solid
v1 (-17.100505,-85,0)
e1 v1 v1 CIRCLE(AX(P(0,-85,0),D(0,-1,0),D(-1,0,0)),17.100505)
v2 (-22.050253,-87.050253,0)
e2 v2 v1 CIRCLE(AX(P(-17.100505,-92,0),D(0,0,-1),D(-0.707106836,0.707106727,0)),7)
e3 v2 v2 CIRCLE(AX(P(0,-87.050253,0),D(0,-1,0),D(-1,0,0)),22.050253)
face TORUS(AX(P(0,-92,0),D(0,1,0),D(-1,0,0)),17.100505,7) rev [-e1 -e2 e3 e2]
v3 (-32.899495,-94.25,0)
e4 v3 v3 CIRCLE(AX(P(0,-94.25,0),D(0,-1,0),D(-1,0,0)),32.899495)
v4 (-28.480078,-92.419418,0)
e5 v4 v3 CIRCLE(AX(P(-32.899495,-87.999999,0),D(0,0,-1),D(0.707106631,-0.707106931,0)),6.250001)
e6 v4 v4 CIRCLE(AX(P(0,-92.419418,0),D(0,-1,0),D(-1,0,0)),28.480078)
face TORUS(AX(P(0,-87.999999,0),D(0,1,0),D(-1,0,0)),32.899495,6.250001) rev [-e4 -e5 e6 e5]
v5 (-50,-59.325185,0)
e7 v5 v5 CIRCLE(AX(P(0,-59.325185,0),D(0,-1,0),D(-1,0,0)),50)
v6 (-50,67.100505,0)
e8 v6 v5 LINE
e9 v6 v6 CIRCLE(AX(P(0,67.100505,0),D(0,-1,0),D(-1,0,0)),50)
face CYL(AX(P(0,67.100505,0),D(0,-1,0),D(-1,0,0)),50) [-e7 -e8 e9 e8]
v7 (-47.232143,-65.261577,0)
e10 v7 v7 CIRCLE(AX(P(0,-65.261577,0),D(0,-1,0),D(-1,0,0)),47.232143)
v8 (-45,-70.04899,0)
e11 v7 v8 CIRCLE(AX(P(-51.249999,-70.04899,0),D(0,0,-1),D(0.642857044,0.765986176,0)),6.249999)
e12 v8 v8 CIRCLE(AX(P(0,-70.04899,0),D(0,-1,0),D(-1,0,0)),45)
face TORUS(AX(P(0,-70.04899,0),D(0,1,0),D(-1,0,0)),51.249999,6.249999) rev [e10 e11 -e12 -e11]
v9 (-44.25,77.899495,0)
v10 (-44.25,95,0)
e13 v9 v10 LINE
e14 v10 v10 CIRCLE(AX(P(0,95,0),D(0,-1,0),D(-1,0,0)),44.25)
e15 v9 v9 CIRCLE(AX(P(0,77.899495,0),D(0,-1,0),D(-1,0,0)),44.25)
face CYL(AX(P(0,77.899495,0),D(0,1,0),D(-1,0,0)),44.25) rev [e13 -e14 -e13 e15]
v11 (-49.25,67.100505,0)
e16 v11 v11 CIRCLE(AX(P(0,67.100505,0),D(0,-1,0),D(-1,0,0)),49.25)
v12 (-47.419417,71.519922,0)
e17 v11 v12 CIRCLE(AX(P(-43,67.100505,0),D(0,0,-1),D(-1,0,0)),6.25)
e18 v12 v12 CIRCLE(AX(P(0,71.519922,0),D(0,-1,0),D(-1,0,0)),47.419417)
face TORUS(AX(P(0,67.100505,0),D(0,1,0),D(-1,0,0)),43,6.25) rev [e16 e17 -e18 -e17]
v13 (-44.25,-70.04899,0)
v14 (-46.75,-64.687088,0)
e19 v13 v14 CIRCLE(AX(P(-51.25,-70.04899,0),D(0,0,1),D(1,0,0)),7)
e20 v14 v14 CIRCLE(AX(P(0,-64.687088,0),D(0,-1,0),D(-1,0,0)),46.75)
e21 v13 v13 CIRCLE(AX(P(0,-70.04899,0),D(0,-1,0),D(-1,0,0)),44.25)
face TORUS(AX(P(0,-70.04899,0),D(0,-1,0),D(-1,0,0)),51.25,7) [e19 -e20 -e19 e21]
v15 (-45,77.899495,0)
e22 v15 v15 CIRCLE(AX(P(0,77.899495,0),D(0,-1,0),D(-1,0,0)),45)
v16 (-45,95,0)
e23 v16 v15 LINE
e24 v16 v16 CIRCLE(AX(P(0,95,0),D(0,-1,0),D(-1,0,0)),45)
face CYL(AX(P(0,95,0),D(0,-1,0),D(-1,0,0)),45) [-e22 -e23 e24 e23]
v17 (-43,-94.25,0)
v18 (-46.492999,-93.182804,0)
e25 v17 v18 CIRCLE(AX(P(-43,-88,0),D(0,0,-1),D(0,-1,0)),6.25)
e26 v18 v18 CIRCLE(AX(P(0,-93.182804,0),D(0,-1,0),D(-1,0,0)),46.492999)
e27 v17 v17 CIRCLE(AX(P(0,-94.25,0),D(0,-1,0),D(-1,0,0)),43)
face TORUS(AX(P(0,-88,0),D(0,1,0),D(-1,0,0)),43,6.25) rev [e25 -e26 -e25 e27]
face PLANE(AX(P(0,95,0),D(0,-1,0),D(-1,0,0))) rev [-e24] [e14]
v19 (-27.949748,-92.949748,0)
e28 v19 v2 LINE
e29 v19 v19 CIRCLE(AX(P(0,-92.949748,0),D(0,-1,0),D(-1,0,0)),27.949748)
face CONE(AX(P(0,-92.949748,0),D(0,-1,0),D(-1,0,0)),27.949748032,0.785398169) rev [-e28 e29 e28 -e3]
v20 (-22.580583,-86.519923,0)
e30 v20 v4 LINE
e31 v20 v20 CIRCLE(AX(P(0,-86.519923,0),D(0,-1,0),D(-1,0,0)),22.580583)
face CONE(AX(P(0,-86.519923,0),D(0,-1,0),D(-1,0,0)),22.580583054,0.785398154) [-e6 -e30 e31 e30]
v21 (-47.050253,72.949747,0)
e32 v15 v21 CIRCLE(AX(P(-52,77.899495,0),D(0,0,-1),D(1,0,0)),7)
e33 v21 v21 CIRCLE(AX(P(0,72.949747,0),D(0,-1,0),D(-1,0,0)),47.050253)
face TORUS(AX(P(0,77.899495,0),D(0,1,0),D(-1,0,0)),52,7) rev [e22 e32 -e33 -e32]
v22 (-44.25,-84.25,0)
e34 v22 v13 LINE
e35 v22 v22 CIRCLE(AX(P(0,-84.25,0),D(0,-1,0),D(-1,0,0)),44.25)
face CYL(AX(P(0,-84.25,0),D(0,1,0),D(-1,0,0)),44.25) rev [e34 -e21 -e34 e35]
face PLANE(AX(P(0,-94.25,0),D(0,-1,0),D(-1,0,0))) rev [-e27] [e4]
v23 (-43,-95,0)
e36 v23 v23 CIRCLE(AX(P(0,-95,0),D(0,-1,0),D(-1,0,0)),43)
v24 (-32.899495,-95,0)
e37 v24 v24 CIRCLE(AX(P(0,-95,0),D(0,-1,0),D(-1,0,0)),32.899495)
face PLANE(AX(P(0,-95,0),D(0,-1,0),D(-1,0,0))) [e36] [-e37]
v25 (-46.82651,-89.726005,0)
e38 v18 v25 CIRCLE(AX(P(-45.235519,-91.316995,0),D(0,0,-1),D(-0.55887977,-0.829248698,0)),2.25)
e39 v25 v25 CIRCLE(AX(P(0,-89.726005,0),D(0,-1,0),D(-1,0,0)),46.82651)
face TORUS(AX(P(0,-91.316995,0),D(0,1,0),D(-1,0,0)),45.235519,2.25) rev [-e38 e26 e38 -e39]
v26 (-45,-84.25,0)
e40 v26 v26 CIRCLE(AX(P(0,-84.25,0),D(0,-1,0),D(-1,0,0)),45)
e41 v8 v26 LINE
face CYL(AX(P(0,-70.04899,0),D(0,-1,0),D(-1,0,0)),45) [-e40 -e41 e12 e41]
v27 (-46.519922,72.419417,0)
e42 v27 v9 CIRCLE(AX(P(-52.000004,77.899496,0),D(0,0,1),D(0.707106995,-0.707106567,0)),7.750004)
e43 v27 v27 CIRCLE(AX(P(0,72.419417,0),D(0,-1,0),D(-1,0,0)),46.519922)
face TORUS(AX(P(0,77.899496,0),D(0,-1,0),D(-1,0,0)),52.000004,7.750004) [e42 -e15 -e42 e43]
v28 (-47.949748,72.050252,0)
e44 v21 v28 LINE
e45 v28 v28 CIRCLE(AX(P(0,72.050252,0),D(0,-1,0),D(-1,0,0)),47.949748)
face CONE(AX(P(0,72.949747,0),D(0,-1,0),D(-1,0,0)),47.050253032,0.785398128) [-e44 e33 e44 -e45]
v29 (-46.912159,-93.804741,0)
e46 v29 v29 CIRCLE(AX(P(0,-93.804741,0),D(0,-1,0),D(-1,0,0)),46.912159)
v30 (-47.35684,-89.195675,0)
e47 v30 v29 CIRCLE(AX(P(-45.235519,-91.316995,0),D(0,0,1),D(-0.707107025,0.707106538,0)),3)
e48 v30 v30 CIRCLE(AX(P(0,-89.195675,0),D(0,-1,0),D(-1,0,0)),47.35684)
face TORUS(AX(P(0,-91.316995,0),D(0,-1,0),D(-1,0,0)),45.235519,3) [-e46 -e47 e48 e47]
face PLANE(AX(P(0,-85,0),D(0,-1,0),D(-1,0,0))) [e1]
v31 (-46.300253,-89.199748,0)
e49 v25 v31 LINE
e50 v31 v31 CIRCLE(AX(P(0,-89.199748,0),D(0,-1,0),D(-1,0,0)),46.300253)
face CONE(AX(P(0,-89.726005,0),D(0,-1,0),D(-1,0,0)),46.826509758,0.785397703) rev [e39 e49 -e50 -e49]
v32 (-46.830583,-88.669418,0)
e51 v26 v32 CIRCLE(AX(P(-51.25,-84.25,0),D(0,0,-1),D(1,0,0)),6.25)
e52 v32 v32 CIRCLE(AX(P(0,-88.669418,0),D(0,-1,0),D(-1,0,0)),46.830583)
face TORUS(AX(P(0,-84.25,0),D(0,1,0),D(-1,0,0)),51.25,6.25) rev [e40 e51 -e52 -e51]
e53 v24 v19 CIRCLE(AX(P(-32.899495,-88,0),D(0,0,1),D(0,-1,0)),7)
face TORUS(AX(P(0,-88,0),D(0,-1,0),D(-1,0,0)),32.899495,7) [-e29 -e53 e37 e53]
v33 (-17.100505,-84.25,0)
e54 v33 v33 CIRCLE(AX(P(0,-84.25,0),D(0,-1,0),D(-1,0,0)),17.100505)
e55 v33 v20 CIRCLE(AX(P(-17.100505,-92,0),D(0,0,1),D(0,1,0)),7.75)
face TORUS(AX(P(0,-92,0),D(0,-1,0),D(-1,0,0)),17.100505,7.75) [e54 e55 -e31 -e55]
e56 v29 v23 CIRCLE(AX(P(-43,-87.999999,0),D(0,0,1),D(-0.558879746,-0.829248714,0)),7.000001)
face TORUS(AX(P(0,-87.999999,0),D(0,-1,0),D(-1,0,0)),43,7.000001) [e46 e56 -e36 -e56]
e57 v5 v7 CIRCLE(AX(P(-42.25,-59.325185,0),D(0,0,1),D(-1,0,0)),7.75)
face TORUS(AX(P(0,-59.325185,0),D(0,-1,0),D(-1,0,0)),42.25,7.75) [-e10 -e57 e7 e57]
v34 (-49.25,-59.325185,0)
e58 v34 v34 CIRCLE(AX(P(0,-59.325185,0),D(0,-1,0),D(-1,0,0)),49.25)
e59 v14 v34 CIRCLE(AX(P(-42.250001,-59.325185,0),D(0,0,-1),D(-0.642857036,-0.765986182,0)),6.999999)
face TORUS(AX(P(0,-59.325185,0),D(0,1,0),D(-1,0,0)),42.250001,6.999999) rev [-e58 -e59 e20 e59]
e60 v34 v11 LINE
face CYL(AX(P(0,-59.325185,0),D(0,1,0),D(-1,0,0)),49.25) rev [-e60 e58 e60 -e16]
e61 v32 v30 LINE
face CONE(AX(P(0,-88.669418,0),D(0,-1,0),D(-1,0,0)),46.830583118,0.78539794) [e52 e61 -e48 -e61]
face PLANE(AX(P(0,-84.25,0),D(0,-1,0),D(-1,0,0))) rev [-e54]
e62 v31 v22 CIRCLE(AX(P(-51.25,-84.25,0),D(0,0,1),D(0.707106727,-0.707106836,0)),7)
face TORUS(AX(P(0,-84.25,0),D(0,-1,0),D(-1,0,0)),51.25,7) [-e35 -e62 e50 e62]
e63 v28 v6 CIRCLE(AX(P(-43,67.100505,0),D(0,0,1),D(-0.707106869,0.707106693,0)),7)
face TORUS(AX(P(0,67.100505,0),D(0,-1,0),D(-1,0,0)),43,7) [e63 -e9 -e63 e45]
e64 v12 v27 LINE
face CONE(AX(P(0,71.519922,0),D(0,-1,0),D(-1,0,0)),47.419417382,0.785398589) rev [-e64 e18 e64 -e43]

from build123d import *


# Not quite as in the source:
# - ends of sketch curves that miss each other by under 0.0002 mm in the source are joined


with BuildPart() as f1:
    # F0 (on Top) → F1 (revolve)
    with BuildSketch(Plane.XY):
        with BuildLine():
            Line((-50, 0), (-49.25, 0))
            Line((-49.25, 0), (-49.25, 67.100505))
            ThreePointArc((-49.25, 67.100505), (-48.7742470782, 69.4922764523), (-47.4194173824, 71.5199223824))
            Line((-47.4194173824, 71.5199223824), (-46.519922, 72.419417))
            ThreePointArc((-46.519922, 72.419417), (-44.839933623, 74.9336983992), (-44.25, 77.899495))
            Line((-44.25, 77.899495), (-44.25, 95))
            Line((-44.25, 95), (-45, 95))
            Line((-45, 95), (-45, 77.899495))
            ThreePointArc((-45, 77.899495), (-45.5328434077, 75.2207106468), (-47.0502530317, 72.9497470317))
            Line((-47.0502530317, 72.9497470317), (-47.949748, 72.050252))
            ThreePointArc((-47.949748, 72.050252), (-49.4671568629, 69.7792886999), (-50, 67.100505))
            Line((-50, 67.100505), (-50, 0))
        make_face()
        with BuildLine():
            Line((0, -85), (0, -84.25))
            Line((0, -84.25), (-17.100505, -84.25))
            ThreePointArc((-17.100505, -84.25), (-20.0663019275, -84.8399337583), (-22.5805830542, -86.5199229458))
            Line((-22.5805830542, -86.5199229458), (-28.480078, -92.419418))
            ThreePointArc((-28.480078, -92.419418), (-30.5077238744, -93.7742472135), (-32.899495, -94.25))
            Line((-32.899495, -94.25), (-43, -94.25))
            ThreePointArc((-43, -94.25), (-44.8261945083, -93.97724967), (-46.4929985671, -93.1828043577))
            ThreePointArc((-46.4929985671, -93.1828043577), (-47.4751196599, -91.5330711078), (-46.8265097577, -89.7260052423))
            Line((-46.8265097577, -89.7260052423), (-46.300253, -89.199748))
            ThreePointArc((-46.300253, -89.199748), (-44.7828434077, -86.9287843532), (-44.25, -84.25))
            Line((-44.25, -84.25), (-44.25, -70.04899))
            ThreePointArc((-44.25, -70.04899), (-44.9057111418, -67.090950297), (-46.7499996812, -64.6870876202))
            ThreePointArc((-46.7499996812, -64.6870876202), (-48.5942887223, -62.2832249943), (-49.25, -59.325185))
            Line((-49.25, -59.325185), (-49.25, 0))
            Line((-49.25, 0), (-50, 0))
            Line((-50, 0), (-50, -59.325185))
            ThreePointArc((-50, -59.325185), (-49.2740340482, -62.6001576243), (-47.2321430477, -65.2615770568))
            ThreePointArc((-47.2321430477, -65.2615770568), (-45.5854564677, -67.4078829271), (-45, -70.04899))
            Line((-45, -70.04899), (-45, -84.25))
            ThreePointArc((-45, -84.25), (-45.4757530571, -86.6417717789), (-46.8305831176, -88.6694178824))
            Line((-46.8305831176, -88.6694178824), (-47.35684, -89.195675))
            ThreePointArc((-47.35684, -89.195675), (-48.2216532424, -91.6050961743), (-46.9121588277, -93.8047407443))
            ThreePointArc((-46.9121588277, -93.8047407443), (-45.0453380572, -94.6945195669), (-43, -95))
            Line((-43, -95), (-32.899495, -95))
            ThreePointArc((-32.899495, -95), (-30.2207113001, -94.4671568629), (-27.9497480317, -92.9497479683))
            Line((-27.9497480317, -92.9497479683), (-22.050253, -87.050253))
            ThreePointArc((-22.050253, -87.050253), (-19.7792893532, -85.5328434077), (-17.100505, -85))
            Line((-17.100505, -85), (0, -85))
        make_face()
    revolve(axis=Axis((0, 0, 0), (0, -1, 0)))


solid = f1.part
